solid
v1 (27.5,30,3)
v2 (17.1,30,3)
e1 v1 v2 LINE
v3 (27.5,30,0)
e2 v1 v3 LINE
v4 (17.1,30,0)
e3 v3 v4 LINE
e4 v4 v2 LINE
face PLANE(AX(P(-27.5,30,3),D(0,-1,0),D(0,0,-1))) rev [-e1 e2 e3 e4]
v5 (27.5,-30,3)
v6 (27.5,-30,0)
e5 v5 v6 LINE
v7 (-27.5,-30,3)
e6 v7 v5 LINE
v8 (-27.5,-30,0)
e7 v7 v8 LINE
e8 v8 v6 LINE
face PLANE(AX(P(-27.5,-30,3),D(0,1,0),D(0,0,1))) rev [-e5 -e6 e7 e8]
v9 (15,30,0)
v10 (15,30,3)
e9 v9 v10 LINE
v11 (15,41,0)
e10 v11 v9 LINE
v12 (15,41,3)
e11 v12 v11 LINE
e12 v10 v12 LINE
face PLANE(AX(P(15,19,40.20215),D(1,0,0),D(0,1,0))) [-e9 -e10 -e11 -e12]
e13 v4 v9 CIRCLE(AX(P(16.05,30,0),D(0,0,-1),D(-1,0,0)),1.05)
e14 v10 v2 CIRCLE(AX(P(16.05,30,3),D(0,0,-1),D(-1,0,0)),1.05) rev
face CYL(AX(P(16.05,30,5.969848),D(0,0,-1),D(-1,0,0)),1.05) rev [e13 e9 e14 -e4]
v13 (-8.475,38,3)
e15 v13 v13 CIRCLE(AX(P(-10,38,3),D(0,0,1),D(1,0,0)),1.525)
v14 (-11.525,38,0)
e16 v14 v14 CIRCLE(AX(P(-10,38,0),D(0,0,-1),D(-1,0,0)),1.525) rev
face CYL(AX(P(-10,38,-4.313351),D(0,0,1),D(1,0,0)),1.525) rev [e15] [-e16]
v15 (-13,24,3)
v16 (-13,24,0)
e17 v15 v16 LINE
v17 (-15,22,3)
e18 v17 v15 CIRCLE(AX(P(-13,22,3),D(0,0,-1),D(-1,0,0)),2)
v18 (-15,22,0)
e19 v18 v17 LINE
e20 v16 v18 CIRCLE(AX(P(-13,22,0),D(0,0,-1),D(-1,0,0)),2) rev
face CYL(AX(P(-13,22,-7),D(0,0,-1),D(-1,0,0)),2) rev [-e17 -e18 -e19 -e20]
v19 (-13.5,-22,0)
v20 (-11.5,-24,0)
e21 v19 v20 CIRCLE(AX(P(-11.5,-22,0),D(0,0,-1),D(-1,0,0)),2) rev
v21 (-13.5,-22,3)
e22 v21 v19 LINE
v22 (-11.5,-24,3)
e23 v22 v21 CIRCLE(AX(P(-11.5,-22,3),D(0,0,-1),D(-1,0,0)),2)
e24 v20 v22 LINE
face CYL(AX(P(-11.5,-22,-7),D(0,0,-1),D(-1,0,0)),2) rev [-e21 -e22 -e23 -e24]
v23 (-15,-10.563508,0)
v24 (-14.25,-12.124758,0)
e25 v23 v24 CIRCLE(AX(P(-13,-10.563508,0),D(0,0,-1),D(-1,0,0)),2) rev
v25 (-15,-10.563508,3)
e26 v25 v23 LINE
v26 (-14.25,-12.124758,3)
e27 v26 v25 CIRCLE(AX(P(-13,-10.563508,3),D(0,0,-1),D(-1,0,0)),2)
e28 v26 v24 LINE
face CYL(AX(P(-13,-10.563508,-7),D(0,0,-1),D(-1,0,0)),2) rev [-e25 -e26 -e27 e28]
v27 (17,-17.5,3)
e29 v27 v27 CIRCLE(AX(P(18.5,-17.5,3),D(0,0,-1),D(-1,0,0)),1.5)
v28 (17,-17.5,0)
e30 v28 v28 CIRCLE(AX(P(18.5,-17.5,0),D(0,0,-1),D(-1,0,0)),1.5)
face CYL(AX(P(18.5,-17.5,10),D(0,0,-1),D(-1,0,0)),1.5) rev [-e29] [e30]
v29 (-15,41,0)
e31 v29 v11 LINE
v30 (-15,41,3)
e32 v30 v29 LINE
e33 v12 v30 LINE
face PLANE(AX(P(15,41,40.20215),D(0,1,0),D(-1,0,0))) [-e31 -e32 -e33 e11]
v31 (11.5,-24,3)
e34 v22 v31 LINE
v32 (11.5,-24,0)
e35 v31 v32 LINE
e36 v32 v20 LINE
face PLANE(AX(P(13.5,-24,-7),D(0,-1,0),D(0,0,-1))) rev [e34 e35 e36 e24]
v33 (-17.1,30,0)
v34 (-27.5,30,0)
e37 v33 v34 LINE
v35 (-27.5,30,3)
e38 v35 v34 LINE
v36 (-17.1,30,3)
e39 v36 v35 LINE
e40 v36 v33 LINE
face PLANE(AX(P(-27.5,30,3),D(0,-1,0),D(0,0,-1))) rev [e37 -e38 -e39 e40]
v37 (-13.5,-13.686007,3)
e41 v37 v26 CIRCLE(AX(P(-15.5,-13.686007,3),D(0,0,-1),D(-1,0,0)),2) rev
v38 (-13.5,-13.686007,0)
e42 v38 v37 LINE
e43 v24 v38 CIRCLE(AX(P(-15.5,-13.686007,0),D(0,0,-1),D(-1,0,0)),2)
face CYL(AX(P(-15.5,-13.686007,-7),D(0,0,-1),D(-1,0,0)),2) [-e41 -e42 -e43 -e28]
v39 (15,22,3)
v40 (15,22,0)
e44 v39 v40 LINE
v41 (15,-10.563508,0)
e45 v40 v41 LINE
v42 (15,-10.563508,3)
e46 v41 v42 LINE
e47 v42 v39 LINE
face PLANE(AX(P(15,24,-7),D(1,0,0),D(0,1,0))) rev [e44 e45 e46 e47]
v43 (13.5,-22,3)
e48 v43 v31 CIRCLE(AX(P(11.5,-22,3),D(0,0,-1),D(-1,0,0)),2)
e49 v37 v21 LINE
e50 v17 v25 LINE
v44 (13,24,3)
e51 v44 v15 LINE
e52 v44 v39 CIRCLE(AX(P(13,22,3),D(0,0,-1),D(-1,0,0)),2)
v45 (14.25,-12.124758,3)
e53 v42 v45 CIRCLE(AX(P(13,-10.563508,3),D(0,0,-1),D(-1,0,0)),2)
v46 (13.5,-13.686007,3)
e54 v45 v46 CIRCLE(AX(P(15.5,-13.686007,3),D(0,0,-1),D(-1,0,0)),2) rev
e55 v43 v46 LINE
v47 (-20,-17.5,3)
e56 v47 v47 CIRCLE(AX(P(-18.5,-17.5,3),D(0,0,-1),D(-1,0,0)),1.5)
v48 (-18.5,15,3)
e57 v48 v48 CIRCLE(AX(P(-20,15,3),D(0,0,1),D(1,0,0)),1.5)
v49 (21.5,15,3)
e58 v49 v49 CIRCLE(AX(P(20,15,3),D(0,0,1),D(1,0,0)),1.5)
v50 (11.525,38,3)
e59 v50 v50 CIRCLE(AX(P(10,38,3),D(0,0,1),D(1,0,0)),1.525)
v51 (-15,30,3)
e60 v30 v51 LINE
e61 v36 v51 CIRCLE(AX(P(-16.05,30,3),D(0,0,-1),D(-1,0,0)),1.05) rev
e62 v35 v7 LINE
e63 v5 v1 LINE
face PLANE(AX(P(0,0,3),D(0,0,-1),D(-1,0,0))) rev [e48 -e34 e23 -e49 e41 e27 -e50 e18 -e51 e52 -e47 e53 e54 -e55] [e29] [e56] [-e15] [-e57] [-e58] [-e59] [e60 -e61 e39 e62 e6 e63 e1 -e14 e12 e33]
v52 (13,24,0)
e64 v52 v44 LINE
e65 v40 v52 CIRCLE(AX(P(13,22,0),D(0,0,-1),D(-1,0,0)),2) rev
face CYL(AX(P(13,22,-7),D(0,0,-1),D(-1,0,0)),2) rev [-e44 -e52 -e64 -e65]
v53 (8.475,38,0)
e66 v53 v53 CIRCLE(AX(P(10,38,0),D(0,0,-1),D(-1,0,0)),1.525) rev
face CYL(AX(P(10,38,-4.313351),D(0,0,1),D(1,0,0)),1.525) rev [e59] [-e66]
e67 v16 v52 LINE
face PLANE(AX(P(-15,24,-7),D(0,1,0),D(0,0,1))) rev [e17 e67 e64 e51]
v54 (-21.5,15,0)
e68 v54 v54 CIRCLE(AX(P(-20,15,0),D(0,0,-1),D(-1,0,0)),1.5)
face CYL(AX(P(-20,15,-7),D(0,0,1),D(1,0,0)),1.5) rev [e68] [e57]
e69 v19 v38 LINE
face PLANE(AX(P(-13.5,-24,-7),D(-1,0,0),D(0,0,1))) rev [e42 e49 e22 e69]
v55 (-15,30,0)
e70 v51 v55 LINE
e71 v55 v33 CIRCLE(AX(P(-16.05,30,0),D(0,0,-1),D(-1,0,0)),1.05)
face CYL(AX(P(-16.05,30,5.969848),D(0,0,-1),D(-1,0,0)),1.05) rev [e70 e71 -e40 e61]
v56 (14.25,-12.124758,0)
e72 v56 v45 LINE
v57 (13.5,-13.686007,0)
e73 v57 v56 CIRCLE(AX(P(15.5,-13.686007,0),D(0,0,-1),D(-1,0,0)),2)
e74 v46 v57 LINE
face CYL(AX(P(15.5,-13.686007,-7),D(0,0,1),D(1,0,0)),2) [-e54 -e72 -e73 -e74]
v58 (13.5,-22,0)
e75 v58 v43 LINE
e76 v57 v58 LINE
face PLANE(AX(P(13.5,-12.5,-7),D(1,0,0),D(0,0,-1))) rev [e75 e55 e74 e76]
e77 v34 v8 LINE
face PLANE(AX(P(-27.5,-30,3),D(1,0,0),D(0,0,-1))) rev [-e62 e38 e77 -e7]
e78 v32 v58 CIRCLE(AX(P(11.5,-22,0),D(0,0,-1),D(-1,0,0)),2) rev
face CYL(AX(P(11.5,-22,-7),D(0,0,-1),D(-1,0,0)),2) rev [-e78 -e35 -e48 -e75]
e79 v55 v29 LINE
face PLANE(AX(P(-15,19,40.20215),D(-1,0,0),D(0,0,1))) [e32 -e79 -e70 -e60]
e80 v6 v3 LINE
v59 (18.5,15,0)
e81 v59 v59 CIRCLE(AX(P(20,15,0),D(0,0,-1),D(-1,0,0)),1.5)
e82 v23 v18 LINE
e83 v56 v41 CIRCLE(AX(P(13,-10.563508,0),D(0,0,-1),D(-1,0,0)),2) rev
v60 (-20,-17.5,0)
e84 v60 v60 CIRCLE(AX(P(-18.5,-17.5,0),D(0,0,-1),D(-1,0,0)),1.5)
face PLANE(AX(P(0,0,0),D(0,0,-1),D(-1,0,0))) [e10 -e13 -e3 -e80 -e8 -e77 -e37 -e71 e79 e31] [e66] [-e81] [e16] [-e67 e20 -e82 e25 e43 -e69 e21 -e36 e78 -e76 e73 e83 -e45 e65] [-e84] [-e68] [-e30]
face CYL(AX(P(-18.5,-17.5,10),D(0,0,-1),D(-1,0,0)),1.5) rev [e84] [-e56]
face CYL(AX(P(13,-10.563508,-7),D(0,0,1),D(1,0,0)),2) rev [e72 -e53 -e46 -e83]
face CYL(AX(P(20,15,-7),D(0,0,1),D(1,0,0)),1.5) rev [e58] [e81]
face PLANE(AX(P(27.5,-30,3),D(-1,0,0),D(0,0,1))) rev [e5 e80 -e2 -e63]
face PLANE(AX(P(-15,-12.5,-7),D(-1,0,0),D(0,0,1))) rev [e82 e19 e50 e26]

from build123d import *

# Parameters (mm, degrees)
SKETCH_1_W          = 55
SKETCH_1_H          = 60
EXTRUDE_1_DEPTH     = 3
SKETCH_2_W          = 30
SKETCH_2_H          = 22
EXTRUDE_2_DEPTH     = 3
SKETCH_3_R          = 1.05
CUT_EXTRUDE_1_DEPTH = 3
SKETCH_4_R          = 1.525
CUT_EXTRUDE_2_DEPTH = 3
SKETCH_5_R          = 1.5
CUT_EXTRUDE_3_DEPTH = 10
SKETCH_6_R          = 1.5
CUT_EXTRUDE_4_DEPTH = 10
CUT_EXTRUDE_5_DEPTH = 10
FILLET_1_R          = 2
FILLET_2_R          = 2


with BuildPart() as part:
    # 草图1 → 凸台-拉伸1 (new body)
    with BuildSketch(Plane.XY):
        Rectangle(SKETCH_1_W, SKETCH_1_H)
    extrude(amount=EXTRUDE_1_DEPTH)

    # 草图2 → 凸台-拉伸2 (add)
    with BuildSketch(Plane(origin=(0, 0, 0), x_dir=(-1, 0, 0), z_dir=(0, 0, -1))):
        with Locations((0, 30)):
            Rectangle(SKETCH_2_W, SKETCH_2_H)
    extrude(amount=-EXTRUDE_2_DEPTH)

    # 草图3 → 切除-拉伸1 (cut)
    with BuildSketch(Plane(origin=(0, 0, 0), x_dir=(-1, 0, 0), z_dir=(0, 0, -1))):
        with Locations((-16.05, 30)):
            Circle(SKETCH_3_R)
        with Locations((16.05, 30)):
            Circle(SKETCH_3_R)
    extrude(amount=-CUT_EXTRUDE_1_DEPTH, mode=Mode.SUBTRACT)

    # 草图4 → 切除-拉伸2 (cut)
    with BuildSketch(Plane.XY.offset(3)):
        with Locations((-10, 38)):
            Circle(SKETCH_4_R)
        with Locations((10, 38)):
            Circle(SKETCH_4_R)
    extrude(amount=-CUT_EXTRUDE_2_DEPTH, mode=Mode.SUBTRACT)

    # 草图5 → 切除-拉伸3 (cut)
    with BuildSketch(Plane(origin=(0, 0, 0), x_dir=(-1, 0, 0), z_dir=(0, 0, -1))):
        with Locations((-18.5, -17.5)):
            Circle(SKETCH_5_R)
        with Locations((18.5, -17.5)):
            Circle(SKETCH_5_R)
    extrude(amount=-CUT_EXTRUDE_3_DEPTH, mode=Mode.SUBTRACT)

    # 草图6 → 切除-拉伸4 (cut)
    with BuildSketch(Plane.XY.offset(3)):
        with Locations((20, 15)):
            Circle(SKETCH_6_R)
        with Locations((-20, 15)):
            Circle(SKETCH_6_R)
    extrude(amount=-CUT_EXTRUDE_4_DEPTH, mode=Mode.SUBTRACT)

    # 草图7 → 切除-拉伸5 (cut)
    with BuildSketch(Plane.XY.offset(3)):
        Polygon((-15, 24), (15, 24), (15, -12.5), (13.5, -12.5), (13.5, -24), (-13.5, -24), (-13.5, -12.5), (-15, -12.5), align=None)
    extrude(amount=-CUT_EXTRUDE_5_DEPTH, mode=Mode.SUBTRACT)

    # 圆角1
    # the kernel refuses this fillet: 2 mm, written as the material it adds along each edge
    with BuildSketch(Plane(origin=(-15, 24, 3), x_dir=(0, -1, 0), z_dir=(0, 0, -1))) as fillet_1_piece_1:
        with BuildLine():
            CenterArc((FILLET_1_R, -FILLET_1_R), FILLET_1_R, 90, 90)
            Line((0, -FILLET_1_R), (-FILLET_1_R * 0.02, -FILLET_1_R))
            Line((-FILLET_1_R * 0.02, -FILLET_1_R), (-FILLET_1_R * 0.02, FILLET_1_R * 0.02))
            Line((-FILLET_1_R * 0.02, FILLET_1_R * 0.02), (FILLET_1_R, FILLET_1_R * 0.02))
            Line((FILLET_1_R, FILLET_1_R * 0.02), (FILLET_1_R, 0))
        make_face()
    extrude(amount=3)
    with BuildSketch(Plane(origin=(15, 24, 3), x_dir=(0, -1, 0), z_dir=(0, 0, -1)), Plane(origin=(-13.5, -24, 3), x_dir=(0, 1, 0), z_dir=(0, 0, -1)), Plane(origin=(13.5, -24, 3), x_dir=(-1, 0, 0), z_dir=(0, 0, -1))) as fillet_1_piece_2:
        with BuildLine():
            CenterArc((FILLET_1_R, FILLET_1_R), FILLET_1_R, 180, 90)
            Line((0, FILLET_1_R), (-FILLET_1_R * 0.02, FILLET_1_R))
            Line((-FILLET_1_R * 0.02, FILLET_1_R), (-FILLET_1_R * 0.02, -FILLET_1_R * 0.02))
            Line((-FILLET_1_R * 0.02, -FILLET_1_R * 0.02), (FILLET_1_R, -FILLET_1_R * 0.02))
            Line((FILLET_1_R, -FILLET_1_R * 0.02), (FILLET_1_R, 0))
        make_face()
    extrude(amount=3)
    with BuildSketch(Plane(origin=(15, -12.5, 3), x_dir=(-1, 0, 0), z_dir=(0, 0, -1))) as fillet_1_piece_3:
        with BuildLine():
            CenterArc((2, 1.936491673), FILLET_1_R, 180, 75.522487814)
            Line((0, 1.936491673), (-0.04, 1.936491673))
            Line((-0.04, 1.936491673), (-0.04, 0))
            Line((-0.04, 0), (0, -0.04))
            ThreePointArc((0, -0.04), (0.75, -0.04), (1.49, -0.038729833))
            Line((1.49, -0.038729833), (1.5, 0))
        make_face()
    extrude(amount=3)
    with BuildSketch(Plane(origin=(-15, -12.5, 3), x_dir=(0, 1, 0), z_dir=(0, 0, -1))) as fillet_1_piece_4:
        with BuildLine():
            CenterArc((1.936491673, 2), FILLET_1_R, 194.477512186, 75.522487814)
            Line((0, 1.5), (-0.038729833, 1.49))
            ThreePointArc((-0.038729833, 1.49), (-0.04, 0.75), (-0.04, 0))
            Line((-0.04, 0), (0, -0.04))
            Line((0, -0.04), (1.936491673, -0.04))
            Line((1.936491673, -0.04), (1.936491673, 0))
        make_face()
    extrude(amount=3)

    # 圆角2
    fillet_2_edges = [part.edges().sort_by_distance(p)[0] for p in [
        (13.5, -12.5, 1.5),
        (-13.5, -12.5, 1.5),
    ]]
    fillet(fillet_2_edges, radius=FILLET_2_R)


solid = part.part
